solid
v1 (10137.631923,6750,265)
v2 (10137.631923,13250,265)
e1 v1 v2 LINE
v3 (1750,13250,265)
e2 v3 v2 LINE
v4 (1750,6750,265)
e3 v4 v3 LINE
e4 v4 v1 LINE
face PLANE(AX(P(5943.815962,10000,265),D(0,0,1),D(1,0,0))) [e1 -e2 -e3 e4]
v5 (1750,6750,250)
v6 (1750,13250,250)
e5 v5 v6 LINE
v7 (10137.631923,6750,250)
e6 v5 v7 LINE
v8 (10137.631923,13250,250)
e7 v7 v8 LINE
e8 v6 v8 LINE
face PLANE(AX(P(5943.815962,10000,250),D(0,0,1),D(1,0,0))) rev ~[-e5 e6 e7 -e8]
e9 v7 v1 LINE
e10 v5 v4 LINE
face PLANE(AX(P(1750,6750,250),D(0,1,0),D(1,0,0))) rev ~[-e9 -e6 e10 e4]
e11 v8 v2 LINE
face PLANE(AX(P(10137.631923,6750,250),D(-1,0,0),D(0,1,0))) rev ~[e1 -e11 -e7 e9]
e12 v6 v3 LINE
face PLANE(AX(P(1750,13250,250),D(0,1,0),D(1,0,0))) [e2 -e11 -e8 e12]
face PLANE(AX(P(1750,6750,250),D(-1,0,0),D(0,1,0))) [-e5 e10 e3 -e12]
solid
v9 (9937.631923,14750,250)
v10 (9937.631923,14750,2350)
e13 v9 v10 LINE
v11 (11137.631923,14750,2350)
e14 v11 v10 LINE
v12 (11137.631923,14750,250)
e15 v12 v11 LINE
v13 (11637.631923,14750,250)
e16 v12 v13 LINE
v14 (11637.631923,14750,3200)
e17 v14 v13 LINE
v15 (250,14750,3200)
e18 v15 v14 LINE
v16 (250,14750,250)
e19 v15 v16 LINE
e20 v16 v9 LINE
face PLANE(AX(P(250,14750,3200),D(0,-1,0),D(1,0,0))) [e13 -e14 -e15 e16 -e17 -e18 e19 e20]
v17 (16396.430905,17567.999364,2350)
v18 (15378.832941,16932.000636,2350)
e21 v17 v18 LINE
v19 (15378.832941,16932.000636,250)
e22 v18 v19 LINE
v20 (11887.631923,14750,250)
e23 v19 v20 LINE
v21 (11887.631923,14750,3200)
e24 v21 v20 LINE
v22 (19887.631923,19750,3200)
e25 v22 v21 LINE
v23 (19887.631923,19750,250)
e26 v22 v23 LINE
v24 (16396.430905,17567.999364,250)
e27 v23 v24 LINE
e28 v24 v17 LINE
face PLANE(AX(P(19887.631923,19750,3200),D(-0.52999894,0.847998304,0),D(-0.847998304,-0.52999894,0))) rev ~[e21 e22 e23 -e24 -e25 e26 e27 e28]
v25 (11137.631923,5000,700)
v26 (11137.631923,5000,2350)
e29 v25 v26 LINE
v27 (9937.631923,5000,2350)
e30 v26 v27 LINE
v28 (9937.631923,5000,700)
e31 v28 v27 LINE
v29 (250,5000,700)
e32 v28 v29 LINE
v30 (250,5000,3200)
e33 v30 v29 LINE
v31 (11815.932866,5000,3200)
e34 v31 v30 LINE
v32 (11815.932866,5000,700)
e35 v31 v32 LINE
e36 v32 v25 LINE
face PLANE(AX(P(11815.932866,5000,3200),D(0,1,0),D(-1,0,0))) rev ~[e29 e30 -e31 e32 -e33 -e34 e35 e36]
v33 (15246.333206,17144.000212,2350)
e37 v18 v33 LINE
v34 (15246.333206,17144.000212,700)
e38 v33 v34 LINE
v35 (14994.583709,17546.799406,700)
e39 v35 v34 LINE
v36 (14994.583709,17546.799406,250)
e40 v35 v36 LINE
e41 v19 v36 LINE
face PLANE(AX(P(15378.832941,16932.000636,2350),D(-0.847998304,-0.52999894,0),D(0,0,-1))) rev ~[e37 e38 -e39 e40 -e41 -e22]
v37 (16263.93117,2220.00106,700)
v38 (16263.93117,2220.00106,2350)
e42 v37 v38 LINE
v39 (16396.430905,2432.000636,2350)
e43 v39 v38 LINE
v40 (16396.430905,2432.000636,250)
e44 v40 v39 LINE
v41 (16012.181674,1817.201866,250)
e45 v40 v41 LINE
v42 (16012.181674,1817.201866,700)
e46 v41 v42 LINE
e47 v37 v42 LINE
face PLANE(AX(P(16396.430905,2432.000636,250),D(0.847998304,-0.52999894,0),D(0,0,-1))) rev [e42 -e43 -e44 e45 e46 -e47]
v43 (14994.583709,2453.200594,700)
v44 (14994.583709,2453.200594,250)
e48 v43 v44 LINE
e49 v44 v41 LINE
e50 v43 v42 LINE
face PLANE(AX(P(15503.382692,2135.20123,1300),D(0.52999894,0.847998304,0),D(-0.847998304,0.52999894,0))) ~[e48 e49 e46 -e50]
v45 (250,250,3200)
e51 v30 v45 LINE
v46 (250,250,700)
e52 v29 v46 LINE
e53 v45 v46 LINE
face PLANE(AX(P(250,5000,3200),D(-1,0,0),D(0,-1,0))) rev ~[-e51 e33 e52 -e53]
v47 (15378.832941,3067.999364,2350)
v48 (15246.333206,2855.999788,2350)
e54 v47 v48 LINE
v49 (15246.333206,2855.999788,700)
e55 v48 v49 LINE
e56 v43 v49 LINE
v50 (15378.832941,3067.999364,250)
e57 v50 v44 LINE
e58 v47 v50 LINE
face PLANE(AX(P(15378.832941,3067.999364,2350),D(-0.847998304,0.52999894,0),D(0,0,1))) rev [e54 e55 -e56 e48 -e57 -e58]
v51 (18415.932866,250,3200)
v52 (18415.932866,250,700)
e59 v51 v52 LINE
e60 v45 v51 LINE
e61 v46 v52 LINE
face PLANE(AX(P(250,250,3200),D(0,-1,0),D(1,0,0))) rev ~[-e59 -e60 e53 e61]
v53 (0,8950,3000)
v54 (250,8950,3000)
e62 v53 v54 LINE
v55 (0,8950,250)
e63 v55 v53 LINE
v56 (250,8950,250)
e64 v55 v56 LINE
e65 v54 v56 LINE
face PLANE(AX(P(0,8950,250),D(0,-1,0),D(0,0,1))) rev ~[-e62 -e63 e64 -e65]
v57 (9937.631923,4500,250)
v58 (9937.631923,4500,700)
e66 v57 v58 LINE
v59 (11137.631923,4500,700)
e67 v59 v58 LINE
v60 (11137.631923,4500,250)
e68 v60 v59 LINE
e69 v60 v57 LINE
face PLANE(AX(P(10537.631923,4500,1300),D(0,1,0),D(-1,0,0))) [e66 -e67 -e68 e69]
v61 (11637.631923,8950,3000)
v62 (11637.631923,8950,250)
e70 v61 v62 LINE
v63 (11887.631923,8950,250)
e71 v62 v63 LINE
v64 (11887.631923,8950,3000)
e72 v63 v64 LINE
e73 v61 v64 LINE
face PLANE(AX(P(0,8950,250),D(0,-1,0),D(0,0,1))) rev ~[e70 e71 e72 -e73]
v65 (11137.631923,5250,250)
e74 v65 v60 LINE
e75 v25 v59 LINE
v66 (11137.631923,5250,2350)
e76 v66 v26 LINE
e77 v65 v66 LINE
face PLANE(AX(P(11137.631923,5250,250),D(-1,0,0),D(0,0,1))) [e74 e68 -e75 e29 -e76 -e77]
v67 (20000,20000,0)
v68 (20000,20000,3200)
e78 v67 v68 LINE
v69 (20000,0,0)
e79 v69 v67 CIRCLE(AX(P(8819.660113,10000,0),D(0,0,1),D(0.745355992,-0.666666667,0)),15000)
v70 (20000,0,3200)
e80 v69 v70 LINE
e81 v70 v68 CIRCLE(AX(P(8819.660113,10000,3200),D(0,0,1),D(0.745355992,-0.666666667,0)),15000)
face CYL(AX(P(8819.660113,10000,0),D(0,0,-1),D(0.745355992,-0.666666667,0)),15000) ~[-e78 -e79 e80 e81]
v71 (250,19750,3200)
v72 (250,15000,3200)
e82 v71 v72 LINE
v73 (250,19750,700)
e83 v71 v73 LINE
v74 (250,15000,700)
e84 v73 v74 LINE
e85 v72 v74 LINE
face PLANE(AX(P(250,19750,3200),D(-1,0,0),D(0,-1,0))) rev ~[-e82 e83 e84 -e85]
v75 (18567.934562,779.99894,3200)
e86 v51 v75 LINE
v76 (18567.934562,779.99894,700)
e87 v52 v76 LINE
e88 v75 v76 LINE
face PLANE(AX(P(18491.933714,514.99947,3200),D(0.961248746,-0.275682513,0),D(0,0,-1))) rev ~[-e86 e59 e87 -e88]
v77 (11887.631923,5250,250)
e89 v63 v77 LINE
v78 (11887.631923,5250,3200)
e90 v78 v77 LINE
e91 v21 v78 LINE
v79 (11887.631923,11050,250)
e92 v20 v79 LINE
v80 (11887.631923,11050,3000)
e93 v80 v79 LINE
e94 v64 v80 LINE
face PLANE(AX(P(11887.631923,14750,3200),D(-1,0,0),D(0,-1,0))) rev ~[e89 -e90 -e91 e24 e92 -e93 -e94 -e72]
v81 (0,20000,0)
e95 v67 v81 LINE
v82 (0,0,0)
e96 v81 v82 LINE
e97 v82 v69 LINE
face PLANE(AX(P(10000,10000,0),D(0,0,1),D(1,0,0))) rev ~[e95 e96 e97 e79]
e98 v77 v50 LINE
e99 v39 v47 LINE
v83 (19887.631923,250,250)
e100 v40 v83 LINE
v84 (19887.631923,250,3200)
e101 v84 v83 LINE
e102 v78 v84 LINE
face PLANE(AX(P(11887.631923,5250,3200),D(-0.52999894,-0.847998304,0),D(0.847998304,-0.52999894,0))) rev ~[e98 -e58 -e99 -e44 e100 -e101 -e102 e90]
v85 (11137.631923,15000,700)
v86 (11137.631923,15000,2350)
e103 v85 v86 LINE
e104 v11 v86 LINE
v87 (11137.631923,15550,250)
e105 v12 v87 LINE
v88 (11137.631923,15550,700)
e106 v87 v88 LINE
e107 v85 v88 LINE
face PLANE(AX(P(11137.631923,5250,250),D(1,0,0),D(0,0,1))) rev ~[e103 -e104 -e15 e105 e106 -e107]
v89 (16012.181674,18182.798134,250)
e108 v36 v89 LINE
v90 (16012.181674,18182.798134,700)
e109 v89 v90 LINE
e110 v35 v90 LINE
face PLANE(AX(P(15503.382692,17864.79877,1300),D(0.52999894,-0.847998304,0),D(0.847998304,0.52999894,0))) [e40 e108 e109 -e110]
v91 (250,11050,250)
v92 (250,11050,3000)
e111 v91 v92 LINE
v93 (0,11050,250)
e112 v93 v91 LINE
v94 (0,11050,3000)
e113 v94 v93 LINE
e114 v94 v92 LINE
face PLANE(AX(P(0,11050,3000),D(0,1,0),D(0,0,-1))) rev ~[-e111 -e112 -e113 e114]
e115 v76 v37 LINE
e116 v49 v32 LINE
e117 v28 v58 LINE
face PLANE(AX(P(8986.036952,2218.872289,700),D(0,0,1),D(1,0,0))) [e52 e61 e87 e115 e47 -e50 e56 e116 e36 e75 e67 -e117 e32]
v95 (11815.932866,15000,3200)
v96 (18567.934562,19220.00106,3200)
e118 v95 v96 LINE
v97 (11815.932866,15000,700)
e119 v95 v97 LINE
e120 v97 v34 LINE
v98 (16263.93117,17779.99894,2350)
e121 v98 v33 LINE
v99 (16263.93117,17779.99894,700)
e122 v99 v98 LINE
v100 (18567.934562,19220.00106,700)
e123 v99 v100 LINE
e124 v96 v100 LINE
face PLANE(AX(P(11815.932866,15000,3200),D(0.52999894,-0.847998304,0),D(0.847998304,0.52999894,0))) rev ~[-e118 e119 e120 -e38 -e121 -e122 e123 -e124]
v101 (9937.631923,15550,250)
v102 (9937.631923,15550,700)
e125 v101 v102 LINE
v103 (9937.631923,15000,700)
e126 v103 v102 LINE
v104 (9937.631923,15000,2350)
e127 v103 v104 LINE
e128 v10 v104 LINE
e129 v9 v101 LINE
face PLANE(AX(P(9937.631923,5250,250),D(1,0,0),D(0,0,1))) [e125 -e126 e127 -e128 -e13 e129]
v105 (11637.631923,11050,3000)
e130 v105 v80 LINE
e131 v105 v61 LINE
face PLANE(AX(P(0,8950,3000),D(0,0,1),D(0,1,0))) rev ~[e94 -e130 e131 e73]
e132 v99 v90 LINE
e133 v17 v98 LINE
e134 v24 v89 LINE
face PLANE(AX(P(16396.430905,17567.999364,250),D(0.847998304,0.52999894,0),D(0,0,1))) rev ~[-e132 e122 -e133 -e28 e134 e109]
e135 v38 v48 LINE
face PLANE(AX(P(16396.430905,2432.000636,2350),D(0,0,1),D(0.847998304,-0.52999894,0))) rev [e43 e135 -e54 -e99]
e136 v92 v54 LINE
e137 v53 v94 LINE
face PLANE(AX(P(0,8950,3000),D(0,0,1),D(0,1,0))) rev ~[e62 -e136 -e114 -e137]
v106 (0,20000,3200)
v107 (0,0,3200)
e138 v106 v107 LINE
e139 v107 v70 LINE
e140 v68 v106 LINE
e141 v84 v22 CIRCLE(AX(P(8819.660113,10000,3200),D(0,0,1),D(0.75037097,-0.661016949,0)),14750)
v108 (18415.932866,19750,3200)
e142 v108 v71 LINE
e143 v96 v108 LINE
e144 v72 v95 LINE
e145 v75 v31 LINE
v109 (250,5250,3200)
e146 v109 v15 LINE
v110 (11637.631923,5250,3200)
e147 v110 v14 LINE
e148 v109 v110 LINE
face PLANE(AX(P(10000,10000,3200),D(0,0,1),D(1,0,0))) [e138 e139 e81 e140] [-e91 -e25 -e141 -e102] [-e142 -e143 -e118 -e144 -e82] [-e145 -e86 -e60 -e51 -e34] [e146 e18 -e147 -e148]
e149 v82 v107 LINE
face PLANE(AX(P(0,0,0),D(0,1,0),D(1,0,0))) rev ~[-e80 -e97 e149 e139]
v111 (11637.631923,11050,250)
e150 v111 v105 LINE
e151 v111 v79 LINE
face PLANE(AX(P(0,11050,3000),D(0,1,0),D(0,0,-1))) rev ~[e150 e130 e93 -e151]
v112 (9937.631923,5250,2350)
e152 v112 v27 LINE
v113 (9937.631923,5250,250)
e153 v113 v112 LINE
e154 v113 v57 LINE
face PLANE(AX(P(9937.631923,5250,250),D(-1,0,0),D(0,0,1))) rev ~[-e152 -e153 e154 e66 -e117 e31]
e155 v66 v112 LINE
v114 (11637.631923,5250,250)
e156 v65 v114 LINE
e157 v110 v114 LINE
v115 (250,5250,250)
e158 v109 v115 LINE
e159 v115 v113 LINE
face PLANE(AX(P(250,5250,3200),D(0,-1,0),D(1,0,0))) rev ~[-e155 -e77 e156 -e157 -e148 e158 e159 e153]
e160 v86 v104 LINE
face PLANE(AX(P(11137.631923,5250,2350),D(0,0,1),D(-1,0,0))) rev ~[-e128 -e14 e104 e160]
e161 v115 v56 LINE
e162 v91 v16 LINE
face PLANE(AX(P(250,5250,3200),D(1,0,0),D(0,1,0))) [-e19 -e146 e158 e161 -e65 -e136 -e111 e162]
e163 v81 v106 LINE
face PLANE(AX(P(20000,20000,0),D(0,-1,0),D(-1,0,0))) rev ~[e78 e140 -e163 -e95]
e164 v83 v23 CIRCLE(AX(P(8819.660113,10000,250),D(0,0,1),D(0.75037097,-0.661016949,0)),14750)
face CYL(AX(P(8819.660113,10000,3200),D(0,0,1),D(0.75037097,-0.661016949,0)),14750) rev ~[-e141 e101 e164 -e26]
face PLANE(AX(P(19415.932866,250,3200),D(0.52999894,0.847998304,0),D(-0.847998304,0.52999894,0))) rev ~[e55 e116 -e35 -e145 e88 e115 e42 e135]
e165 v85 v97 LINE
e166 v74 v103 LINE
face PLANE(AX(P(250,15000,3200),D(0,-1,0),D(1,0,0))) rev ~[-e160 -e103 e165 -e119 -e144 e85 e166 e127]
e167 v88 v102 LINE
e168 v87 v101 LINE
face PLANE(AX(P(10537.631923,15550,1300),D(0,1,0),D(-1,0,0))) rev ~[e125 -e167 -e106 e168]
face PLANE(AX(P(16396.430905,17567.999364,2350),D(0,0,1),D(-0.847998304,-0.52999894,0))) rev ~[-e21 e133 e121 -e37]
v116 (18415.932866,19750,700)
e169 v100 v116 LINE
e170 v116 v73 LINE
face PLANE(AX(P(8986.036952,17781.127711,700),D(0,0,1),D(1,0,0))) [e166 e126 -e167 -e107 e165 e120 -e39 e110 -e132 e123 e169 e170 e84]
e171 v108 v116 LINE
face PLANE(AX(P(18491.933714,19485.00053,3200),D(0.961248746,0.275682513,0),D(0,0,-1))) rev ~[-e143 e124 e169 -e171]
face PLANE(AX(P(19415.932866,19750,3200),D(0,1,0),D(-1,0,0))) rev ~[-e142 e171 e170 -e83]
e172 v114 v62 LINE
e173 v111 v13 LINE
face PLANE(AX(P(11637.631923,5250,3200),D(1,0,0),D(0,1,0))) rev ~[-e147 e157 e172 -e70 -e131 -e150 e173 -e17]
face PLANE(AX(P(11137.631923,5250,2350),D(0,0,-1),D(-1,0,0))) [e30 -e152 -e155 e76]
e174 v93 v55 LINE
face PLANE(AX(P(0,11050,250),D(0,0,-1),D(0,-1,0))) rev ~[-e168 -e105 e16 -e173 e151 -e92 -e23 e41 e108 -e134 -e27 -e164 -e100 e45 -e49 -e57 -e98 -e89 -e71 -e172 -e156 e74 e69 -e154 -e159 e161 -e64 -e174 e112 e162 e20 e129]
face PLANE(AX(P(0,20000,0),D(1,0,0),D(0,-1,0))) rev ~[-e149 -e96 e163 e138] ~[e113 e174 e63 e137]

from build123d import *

# Parameters (mm, degrees)
F1_DEPTH      = 3200
F2_W          = 11387.6319230904
F2_H          = 9500
F3_DEPTH      = 2950
F4_DEPTH      = 2500
F6_DEPTH      = 15000
F8_W          = 1200
F8_H          = 2100
F9_DEPTH      = 750
F9_DEPTH_BACK = 10300
F12_DEPTH     = 725
F13_W         = 8387.6319230904
F13_H         = 6500
F14_DEPTH     = 15
F15_SIZE      = 1000


# Not quite as in the source:
# - a pattern or mirror of a feature is missing from the dataset's text; its kind, count and spacing are read off the source's solid


with BuildPart() as f1:
    # F0 (on Top) → F1 (new body)
    with BuildSketch(Plane.XY):
        Polygon((0, 20000), (0, 0), (20000, 0), (20000, 10000), (20000, 20000), align=None)
        with BuildLine():
            Line((20000, 10000), (20000, 0))
            ThreePointArc((20000, 0), (22832.2454969418, 4647.6686534036), (23819.6601125011, 10000))
            ThreePointArc((23819.6601125011, 10000), (22832.2454969418, 15352.3313465964), (20000, 20000))
            Line((20000, 20000), (20000, 10000))
        make_face()
    extrude(amount=F1_DEPTH)

    # F2 (on face) → F3 (cut)
    with BuildSketch(Plane.XY.offset(3200)):
        with BuildLine():
            Line((11887.6319230904, 5250), (19887.6319230904, 250))
            ThreePointArc((19887.6319230904, 250), (23569.6601125011, 10000), (19887.6319230904, 19750))
            Line((19887.6319230904, 19750), (11887.6319230904, 14750))
            Line((11887.6319230904, 14750), (11887.6319230904, 5250))
        make_face()
        with Locations((5943.8159615452, 10000)):
            Rectangle(F2_W, F2_H)
    extrude(amount=-F3_DEPTH, mode=Mode.SUBTRACT)

    # F2 (on face) → F4 (cut)
    with BuildSketch(Plane.XY.offset(3200)):
        Polygon((11815.9328664875, 15000), (19415.9328664876, 19750), (250, 19750), (250, 15000), align=None)
        Polygon((250, 5000), (250, 250), (19415.9328664875, 250), (11815.9328664875, 5000), align=None)
    extrude(amount=-F4_DEPTH, mode=Mode.SUBTRACT)

    # F5 (on face) → F6 (cut)
    with BuildSketch(Plane(origin=(0, 0, 0), x_dir=(0, -1, 0), z_dir=(-1, 0, 0))):
        Polygon((-11050, 250), (-10000, 250), (-8950, 250), (-8950, 3000), (-11050, 3000), align=None)
    extrude(amount=-F6_DEPTH, mode=Mode.SUBTRACT)

    # F8 (on face) → F9 (cut, two sides)
    with BuildSketch(Plane(origin=(0, 5250, 0), x_dir=(-1, 0, 0), z_dir=(0, 1, 0))) as f9_sk:
        with Locations((-10537.6319230904, 1300)):
            Rectangle(F8_W, F8_H)
    extrude(amount=-F9_DEPTH, mode=Mode.SUBTRACT)
    extrude(f9_sk.sketch, amount=F9_DEPTH_BACK, mode=Mode.SUBTRACT)

    # F11 (on face) → F12 (cut)
    with BuildSketch(Plane(origin=(-3289.9910328398, 5263.9856525437, 0), x_dir=(0.847998304, 0.52999894, 0), z_dir=(0.52999894, -0.847998304, 0))):
        Polygon((22015.1666404926, 2350), (22015.1666404926, 250), (22615.1666404926, 250), (23215.1666404926, 250), (23215.1666404926, 2350), align=None)
    f12 = extrude(amount=-F12_DEPTH, mode=Mode.SUBTRACT)

    # F12_copies: F12 across plane
    add(f12.mirror(Plane(origin=(0, 10000, 0), x_dir=(0, 0, -1), z_dir=(0, -1, 0))), mode=Mode.SUBTRACT)

    # F15
    f15_edges = [f1.edges().sort_by_distance(p)[0] for p in [
        (19415.932866, 19750, 1950),
        (19415.932866, 250, 1950),
    ]]
    chamfer(f15_edges, length=F15_SIZE)


with BuildPart() as f14:
    # F13 (on face) → F14 (new body)
    with BuildSketch(Plane.XY.offset(250)):
        with Locations((5943.8159615452, 10000)):
            Rectangle(F13_W, F13_H)
    extrude(amount=F14_DEPTH)


solid = Compound([f1.part, f14.part])
